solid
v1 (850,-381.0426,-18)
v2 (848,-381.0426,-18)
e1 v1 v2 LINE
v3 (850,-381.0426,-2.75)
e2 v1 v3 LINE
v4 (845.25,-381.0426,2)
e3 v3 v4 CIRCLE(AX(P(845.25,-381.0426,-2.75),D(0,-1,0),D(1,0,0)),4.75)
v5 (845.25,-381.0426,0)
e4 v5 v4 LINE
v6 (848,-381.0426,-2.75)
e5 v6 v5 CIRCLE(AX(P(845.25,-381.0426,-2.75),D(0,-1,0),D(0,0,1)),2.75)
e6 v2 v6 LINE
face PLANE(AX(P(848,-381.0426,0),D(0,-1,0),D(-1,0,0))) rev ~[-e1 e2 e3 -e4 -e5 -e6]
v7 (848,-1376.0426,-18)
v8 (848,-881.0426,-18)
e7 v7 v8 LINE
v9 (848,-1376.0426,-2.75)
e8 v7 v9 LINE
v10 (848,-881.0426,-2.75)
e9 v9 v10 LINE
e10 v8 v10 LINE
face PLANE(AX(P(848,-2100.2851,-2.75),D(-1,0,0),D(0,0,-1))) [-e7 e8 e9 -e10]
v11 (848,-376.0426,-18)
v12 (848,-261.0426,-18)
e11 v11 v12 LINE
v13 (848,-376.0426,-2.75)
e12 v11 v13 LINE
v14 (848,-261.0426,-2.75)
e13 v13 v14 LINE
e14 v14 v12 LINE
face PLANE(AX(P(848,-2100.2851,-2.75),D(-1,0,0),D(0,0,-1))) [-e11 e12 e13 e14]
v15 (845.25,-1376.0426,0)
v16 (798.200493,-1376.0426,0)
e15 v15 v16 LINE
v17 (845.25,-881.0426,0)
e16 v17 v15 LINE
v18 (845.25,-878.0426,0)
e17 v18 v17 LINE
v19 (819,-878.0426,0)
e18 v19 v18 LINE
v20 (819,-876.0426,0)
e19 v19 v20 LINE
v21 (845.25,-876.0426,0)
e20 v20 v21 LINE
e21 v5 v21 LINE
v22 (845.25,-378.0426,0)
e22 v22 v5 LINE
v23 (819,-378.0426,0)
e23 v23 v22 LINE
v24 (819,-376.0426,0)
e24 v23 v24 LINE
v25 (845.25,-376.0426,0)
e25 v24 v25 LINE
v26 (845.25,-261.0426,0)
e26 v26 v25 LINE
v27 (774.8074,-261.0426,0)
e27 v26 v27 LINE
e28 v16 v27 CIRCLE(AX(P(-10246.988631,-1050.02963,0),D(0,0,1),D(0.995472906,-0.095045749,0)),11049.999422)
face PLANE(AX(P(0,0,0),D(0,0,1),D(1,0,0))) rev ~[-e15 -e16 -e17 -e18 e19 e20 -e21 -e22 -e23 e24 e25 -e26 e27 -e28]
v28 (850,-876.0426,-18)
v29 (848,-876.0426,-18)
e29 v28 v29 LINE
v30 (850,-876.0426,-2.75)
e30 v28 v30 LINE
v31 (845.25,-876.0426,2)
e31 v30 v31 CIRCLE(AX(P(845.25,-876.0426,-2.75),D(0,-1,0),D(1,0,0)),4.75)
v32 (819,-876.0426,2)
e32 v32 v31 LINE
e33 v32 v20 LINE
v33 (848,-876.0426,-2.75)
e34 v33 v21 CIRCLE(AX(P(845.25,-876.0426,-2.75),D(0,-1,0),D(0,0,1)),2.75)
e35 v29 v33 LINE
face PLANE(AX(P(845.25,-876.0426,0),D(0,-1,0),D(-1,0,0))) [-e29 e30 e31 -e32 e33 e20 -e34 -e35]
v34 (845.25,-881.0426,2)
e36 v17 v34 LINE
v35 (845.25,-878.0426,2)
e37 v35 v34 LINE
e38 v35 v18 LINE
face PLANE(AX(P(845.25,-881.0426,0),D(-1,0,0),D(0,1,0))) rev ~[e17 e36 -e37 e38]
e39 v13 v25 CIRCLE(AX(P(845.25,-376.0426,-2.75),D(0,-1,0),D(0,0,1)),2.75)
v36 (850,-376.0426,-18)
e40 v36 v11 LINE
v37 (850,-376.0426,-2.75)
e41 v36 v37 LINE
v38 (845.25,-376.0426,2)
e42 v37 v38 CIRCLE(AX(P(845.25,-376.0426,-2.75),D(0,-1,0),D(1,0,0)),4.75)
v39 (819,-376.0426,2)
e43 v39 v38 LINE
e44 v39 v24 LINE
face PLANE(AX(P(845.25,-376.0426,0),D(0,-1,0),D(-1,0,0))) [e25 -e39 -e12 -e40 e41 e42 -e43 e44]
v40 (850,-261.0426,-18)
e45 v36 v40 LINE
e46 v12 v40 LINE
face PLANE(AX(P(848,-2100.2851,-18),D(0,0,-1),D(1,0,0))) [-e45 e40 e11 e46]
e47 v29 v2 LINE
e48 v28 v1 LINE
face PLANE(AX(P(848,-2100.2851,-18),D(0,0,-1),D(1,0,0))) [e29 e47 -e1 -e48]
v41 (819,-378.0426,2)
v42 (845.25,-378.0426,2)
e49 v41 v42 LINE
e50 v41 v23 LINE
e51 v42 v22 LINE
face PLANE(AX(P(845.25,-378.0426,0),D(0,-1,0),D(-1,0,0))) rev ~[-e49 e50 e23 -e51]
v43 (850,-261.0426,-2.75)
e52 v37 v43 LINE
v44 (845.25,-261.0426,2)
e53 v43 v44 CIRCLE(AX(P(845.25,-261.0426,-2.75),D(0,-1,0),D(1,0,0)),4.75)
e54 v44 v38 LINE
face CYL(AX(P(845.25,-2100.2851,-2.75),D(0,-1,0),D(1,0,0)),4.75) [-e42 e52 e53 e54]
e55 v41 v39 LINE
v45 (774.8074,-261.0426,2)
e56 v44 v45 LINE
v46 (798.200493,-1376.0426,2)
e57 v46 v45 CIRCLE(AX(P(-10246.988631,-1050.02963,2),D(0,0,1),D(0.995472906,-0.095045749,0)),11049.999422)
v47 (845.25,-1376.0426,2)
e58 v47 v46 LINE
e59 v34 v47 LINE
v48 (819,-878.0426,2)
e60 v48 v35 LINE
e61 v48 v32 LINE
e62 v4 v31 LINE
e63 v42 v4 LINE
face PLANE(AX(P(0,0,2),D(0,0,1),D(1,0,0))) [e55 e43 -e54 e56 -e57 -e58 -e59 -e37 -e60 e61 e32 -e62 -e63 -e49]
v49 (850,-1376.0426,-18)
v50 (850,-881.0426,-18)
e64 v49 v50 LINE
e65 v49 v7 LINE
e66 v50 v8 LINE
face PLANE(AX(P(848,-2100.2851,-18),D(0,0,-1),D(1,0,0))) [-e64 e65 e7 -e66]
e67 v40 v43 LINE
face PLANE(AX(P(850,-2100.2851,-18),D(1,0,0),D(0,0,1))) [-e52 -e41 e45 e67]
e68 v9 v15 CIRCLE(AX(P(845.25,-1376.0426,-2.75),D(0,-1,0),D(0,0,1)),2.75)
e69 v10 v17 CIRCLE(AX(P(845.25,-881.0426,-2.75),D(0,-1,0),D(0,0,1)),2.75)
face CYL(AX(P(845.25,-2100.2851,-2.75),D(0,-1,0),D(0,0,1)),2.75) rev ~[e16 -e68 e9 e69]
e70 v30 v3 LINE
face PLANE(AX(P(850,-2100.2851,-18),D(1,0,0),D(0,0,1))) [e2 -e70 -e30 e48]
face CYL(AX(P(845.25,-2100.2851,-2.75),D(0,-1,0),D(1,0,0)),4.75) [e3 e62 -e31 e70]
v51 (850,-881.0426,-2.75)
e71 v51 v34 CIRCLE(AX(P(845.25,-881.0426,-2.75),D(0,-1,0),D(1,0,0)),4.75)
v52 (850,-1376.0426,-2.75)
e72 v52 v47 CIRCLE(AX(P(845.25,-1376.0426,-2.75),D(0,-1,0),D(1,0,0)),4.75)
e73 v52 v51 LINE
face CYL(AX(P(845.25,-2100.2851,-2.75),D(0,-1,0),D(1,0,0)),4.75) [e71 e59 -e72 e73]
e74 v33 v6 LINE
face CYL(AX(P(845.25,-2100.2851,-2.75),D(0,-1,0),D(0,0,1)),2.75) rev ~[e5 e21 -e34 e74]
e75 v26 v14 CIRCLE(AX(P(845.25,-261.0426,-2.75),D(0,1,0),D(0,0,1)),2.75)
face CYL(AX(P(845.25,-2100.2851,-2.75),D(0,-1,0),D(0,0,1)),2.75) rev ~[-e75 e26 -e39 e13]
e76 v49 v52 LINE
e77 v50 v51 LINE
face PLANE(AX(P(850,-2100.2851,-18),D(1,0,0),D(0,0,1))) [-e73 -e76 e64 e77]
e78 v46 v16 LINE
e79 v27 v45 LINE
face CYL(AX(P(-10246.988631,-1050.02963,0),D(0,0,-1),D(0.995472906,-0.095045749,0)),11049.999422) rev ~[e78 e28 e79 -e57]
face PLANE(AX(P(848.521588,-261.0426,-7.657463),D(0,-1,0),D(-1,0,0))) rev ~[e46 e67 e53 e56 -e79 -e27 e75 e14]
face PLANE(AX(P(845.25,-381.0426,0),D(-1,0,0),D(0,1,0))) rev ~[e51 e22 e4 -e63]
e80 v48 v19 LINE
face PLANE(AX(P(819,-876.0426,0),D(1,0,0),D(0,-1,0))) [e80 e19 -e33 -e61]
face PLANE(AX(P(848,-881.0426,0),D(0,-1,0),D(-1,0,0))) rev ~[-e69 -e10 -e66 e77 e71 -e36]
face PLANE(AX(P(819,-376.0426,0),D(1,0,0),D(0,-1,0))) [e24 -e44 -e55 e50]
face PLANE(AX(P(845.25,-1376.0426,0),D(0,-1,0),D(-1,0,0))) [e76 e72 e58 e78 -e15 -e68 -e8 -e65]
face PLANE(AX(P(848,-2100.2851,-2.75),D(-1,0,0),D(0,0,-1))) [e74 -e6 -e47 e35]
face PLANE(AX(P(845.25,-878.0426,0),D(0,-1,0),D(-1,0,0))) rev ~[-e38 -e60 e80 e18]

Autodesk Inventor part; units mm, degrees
ref_plane "YZ Plane" through (0, 0, 0) normal (1, 0, 0) x (0, 1, 0)
ref_plane "XZ Plane" through (0, 0, 0) normal (0, 1, 0) x (-1, 0, 0)
ref_plane "XY Plane" through (0, 0, 0) normal (0, 0, 1) x (1, 0, 0)
sketch "Sketch1" plane through (0, 0, 0) normal (0, 0, 1) x (1, 0, 0)
  arc A0 (750, -2100) -> (770.3488, -241.0426) centre (-10250, -1050) ccw construction
  arc A1 (752.9864, -2100.2851) -> (771.4818, -215.8854) centre (-10246.9892, -1050.0296) ccw
  line L0 (-750, -2700) -> (-750, 0) construction
  line L1 (-800, 50) -> (-800, -2750) construction
  line L2 (-850, -2800) -> (-850, 100) construction
  line L3 (850, 100) -> (850, -2800)
  line L4 (800, -2750) -> (800, 50) construction
  line L5 (750, 0) -> (750, -2700) construction
  line L6 (770.3488, -241.0426) -> (767.3569, -241.2622) construction
  line L7 (768.4904, -216.1118) -> (771.4818, -215.8854) construction
  arc A2 (747.4657, -5.0326) -> (744.8748, -2.3426) centre (744.4792, -5.3164) ccw construction
  arc A3 (747.4657, -5.0326) -> (747.0136, -0.2851) centre (-10252.9895, -1050.2524) ccw construction
  arc A4 (767.3569, -241.2622) -> (747.4657, -5.0326) centre (-10252.9895, -1050.2524) ccw construction
  line L8 (750, 0) -> (747.0136, -0.2851) construction
  arc A5 (750.4522, -4.7486) -> (750, 0) centre (-10250, -1050) ccw construction
  arc A6 (750.4522, -4.7486) -> (745.2706, 0.6314) centre (744.4791, -5.3162) ccw
  line L9 (-750, 0) -> (750, 0) construction
  line L10 (-850, 100) -> (850, 100) construction
  line L11 (800, 50) -> (-800, 50) construction
  arc A7 (770.3488, -241.0426) -> (750.4522, -4.7486) centre (-10250, -1050) ccw
  line L12 (750, -2700) -> (-750, -2700) construction
  line L13 (750, -2100) -> (752.9864, -2100.2851) construction
  line L14 (-800, -2750) -> (800, -2750)
  line L15 (850, -2800) -> (-850, -2800) construction
  arc A8 (110, -2700) -> (114.1118, -2698.3696) centre (110, -2694) ccw construction
  line L16 (0, -2697) -> (110, -2697) construction
  line L17 (0, -2700) -> (0, -2697) construction
  arc A9 (750, 0) -> (745.2706, 0.6314) centre (0, -5600) ccw construction
  line L18 (750, 0) -> (749.6018, -2.9735) construction
  arc A10 (750, -3.0268) -> (0, 47) centre (-0.2, -5603) ccw construction
  line L19 (0, 47) -> (0, 0) construction
  line L20 (0, 50) -> (0, 47) construction
  line L21 (0, 100) -> (0, 50)
  arc A11 (745.2706, 0.6314) -> (0, 50) centre (0, -5600) ccw construction
  line L22 (-750, -2100) -> (750, -2100) construction
  arc A12 (110, -2697) -> (112.0559, -2696.1848) centre (110, -2694) ccw construction
  line L23 (676.3163, -2173.4556) -> (674.2605, -2171.2708) construction
  line L24 (690.4112, -2151.9536) -> (692.4671, -2154.1384) construction
  line L25 (752.0559, -2102.1848) -> (676.3163, -2173.4556) construction
  line L26 (114.1118, -2698.3696) -> (750, -2100) construction
  arc A13 (752.0559, -2102.1848) -> (752.9864, -2100.2851) centre (749.9998, -2099.9999) ccw construction
  line L27 (750, -2100) -> (752.0559, -2102.1848) construction
  arc A14 (749.1768, -2100.7746) -> (750.1074, -2098.8746) centre (747.1209, -2098.5898) ccw construction
  line L28 (112.0559, -2696.1848) -> (690.4112, -2151.9536) construction
  line L29 (850, -261.0426) -> (774.8074, -261.0426)
  arc A15 (800, 50) -> (0, 100) centre (0, -6325) ccw construction
  arc A16 (824.8074, -261.0426) -> (800, 50) centre (-10695.3477, -1023.3288) ccw construction
  line L30 (824.8074, -261.0426) -> (824.8074, 100) construction
  arc A17 (789.9065, -2131.1044) -> (824.8074, -261.0426) centre (-10201.0809, -990.6233) ccw construction
  line L31 (0, -2700) -> (0, -2750) construction
  line L32 (112.3791, -2700) -> (132.2053, -2750) construction
  line L33 (132.2053, -2750) -> (850, -2074.5565)
  arc A18 (770.2924, -241.0467) -> (766.5756, -191.1852) centre (768.4904, -216.1118) ccw construction
  line L34 (850, -400) -> (783.8749, -400) construction
  line L35 (850, -900) -> (801.9923, -900) construction
  line L36 (850, -1400) -> (797.4674, -1400) construction
  line L37 (850, -1900) -> (770.2723, -1900) construction
  line L38 (350, 100) -> (350, 39.1489)
  line L39 (-1472.612, -150) -> (-973.4947, -150)
  line L40 (-1472.612, -700) -> (-973.4947, -700)
  line L41 (-1472.612, -1250) -> (-973.4947, -1250)
  line L42 (-1472.612, -1800) -> (-973.4947, -1800)
  line L43 (800, -2750) -> (850, -2750) construction
  line L44 (752.9864, -2100.2851) -> (850, -2100.2851)
  point P0 (822.6583, -2100.2851)
  dimension "d16" = 1500
  dimension "d17" = 2700
  dimension "d18" = 2100
  dimension "d19" = 6
  dimension "d20" = 3
  dimension "d21" = 3
  dimension "d22" = 6
  dimension "d23" = 3
  dimension "d24" = 241.9
  dimension "d25" = 50
  dimension "d26" = 50
  dimension "d27" = 3
  dimension "d28" = 110
  dimension "d29" = 25
  dimension "d30" = 104
  dimension "d31" = 25
  dimension "d32" = 20
  dimension "d33" = 50
  dimension "d57" = 500
  dimension "d58" = 500
  dimension "d59" = 500
  dimension "d60" = 500
  dimension "d61" = 500
  dimension "d83" = 250
  dimension "d86" = 550
  dimension "d91" = 274.5565
extrude "Plate3" add sketch "Sketch1" along normal blind 2
sketch "Sketch3" plane through (848, -261.0426, 2) normal (1, 0, 0) x (0, 1, 0)
  line L0 (-1839.2425, 0) -> (0, 0)
  line L1 (0, 0) -> (0, 20)
  line L2 (0, 20) -> (-1839.2425, 20)
  line L3 (-1839.2425, 20) -> (-1839.2425, 0)
edge flange "Flange2" height 20 angle 90 thickness 2 bend radius 2.75 thickness toward (1, 0, 0) relief round relief width 2 relief depth 1 edges at (850, -1167.7996, 2) wall of the first edge with corners at (848, -2100.2851, 2) (848, -261.0426, 2) (848, -261.0426, -18) (848, -2100.2851, -18)
bend "Bend2"
corner "Corner2"
sketch "Sketch5" plane through (0, 0, 0) normal (0, 0, 1) x (1, 0, 0)
  line L0 (845.25, -2100.2851) -> (845.25, -261.0426) projected
  line L1 (774.8074, -261.0426) -> (845.25, -261.0426) projected
  arc A0 (752.9864, -2100.2851) -> (774.8074, -261.0426) centre (-10246.9892, -1050.0296) ccw projected
  line L2 (850, -261.0426) -> (850, -2100.2851) projected
  line L3 (850, -376.0426) -> (819, -376.0426)
  line L4 (850, -378.0426) -> (848, -378.0426) construction
  line L5 (848, -2100.2851) -> (848, -261.0426) projected
  line L6 (819, -376.0426) -> (819, -378.0426)
  line L7 (850, -876.0416) -> (801.641, -876.0416) construction
  line L8 (850, -878.0416) -> (801.6723, -878.0416) construction
  line L9 (820, -876.0416) -> (820, -878.0416) construction
  line L10 (850, -1376.0416) -> (798.2005, -1376.0416) construction
  line L11 (850, -1378.0416) -> (798.1413, -1378.0416) construction
  line L12 (820, -1376.0416) -> (820, -1378.0416) construction
  line L13 (850, -1876.0416) -> (772.0945, -1876.0416) construction
  line L14 (850, -1878.0416) -> (771.9443, -1878.0416) construction
  line L15 (820, -1876.0416) -> (820, -1878.0416) construction
  line L16 (850, -881.0416) -> (845.25, -881.0416) construction
  line L17 (845.25, -1381.0416) -> (850, -1381.0416) construction
  line L18 (845.25, -1881.0416) -> (850, -1881.0416) construction
  line L19 (845.25, -2100.2851) -> (752.9864, -2100.2851) projected
  line L20 (850, -376.0426) -> (850, -381.0426)
  line L21 (848, -376.0426) -> (848, -378.0426) construction
  line L22 (850, -381.0426) -> (848, -381.0426)
  line L23 (819, -376.0426) -> (782.437, -376.0426) construction
  line L24 (819, -378.0426) -> (782.559, -378.0426) construction
  line L25 (848, -378.0426) -> (848, -381.0426)
  line L26 (848, -378.0426) -> (819, -378.0426)
  line L27 (848, -381.0426) -> (845.25, -381.0426)
  point P0 (0, 0)
  point P1 (845.25, -380.4205)
  point P2 (848, -380.4205)
  point P3 (848, -1881.0416)
  point P4 (848, -1878.0416)
  point P5 (848, -1381.0416)
  point P6 (848, -1378.0416)
  point P7 (848, -881.0416)
  point P8 (848, -878.0416)
  point P9 (819, -377.0426)
  point P10 (848, -381.0426)
  point P11 (850, -410.4205)
  point P12 (848, -376.0426)
  point P13 (820, -877.0416)
  point P14 (820, -1377.0416)
  point P15 (820, -1877.0416)
  point P16 (848, -381.0426)
  point P17 (845.25, -378.0426)
  dimension "d69" = 1839.2425
  dimension "d70" = 2
  dimension "d76" = 67.563
  dimension "d80" = 48.359
  dimension "d81" = 30
  dimension "d94" = 5
  dimension "d95" = 30
  dimension "d96" = 5
  dimension "d97" = 30
  dimension "d98" = 5
  dimension "d102" = 77.9056
  dimension "d104" = 51.7995
  dimension "d106" = 2
  dimension "d107" = 5
  dimension "d108" = 116
  dimension "d109" = 500
  dimension "d110" = 500
  dimension "d111" = 500
  dimension "d112" = 31
extrude "Extrusion2" cut sketch "Sketch5" along normal through all both and the other way through all contours L0 L26 L5 L27 | L26 L6 L3 L0 | L0 L3 L5 L26 | L5 L3 L2 L22
chamfer "Chamfer2" [suppressed]
pattern_linear "Rectangular Pattern3" count 4 spacing 500 along (0, -1, 0) of "Extrusion2"
sketch "Sketch6" plane through (0, 0, 0) normal (0, 0, -1) x (-1, 0, 0)
  line L0 (-803.1643, -1276.0426) -> (-817.1643, -1276.0426) construction
  line L1 (-817.1643, -1276.0426) -> (-817.1643, -1076.0426) construction
  line L2 (-817.1643, -1076.0426) -> (-803.1643, -1076.0426) construction
  line L3 (-803.1643, -1076.0426) -> (-803.1643, -1276.0426) construction
  line L4 (-752.9864, -2100.2851) -> (-845.25, -2100.2851) projected
  line L5 (-803.1643, -1801.0426) -> (-803.1643, -1851.0426) construction
  line L6 (-803.1643, -1851.0426) -> (-815.1643, -1851.0426) construction
  line L7 (-815.1643, -1851.0426) -> (-815.1643, -1801.0426) construction
  line L8 (-815.1643, -1801.0426) -> (-803.1643, -1801.0426) construction
  line L9 (-845.25, -1876.0426) -> (-819, -1876.0426) projected
  line L10 (-803.1643, -1301.0426) -> (-803.1643, -1351.0426) construction
  line L11 (-803.1643, -1351.0426) -> (-815.1643, -1351.0426) construction
  line L12 (-815.1643, -1351.0426) -> (-815.1643, -1301.0426) construction
  line L13 (-815.1643, -1301.0426) -> (-803.1643, -1301.0426) construction
  line L14 (-803.1643, -801.0426) -> (-803.1643, -851.0426) construction
  line L15 (-803.1643, -851.0426) -> (-815.1643, -851.0426) construction
  line L16 (-815.1643, -851.0426) -> (-815.1643, -801.0426) construction
  line L17 (-815.1643, -801.0426) -> (-803.1643, -801.0426) construction
  line L18 (-803.1643, -301.0426) -> (-803.1643, -351.0426) construction
  line L19 (-803.1643, -351.0426) -> (-815.1643, -351.0426) construction
  line L20 (-815.1643, -351.0426) -> (-815.1643, -301.0426) construction
  line L21 (-815.1643, -301.0426) -> (-803.1643, -301.0426) construction
  line L22 (-845.25, -1376.0426) -> (-819, -1376.0426) projected
  line L23 (-845.25, -876.0426) -> (-819, -876.0426) projected
  line L24 (-845.25, -376.0426) -> (-819, -376.0426) projected
  point P0 (0, 0)
  point P1 (-753.1643, -2098.4205)
  point P2 (-824.6397, -2098.4205)
  dimension "d120" = 200
  dimension "d121" = 14
  dimension "d124" = 50
  dimension "d125" = 12
  dimension "d126" = 50
  dimension "d127" = 25
  dimension "d128" = 50
  dimension "d129" = 12
  dimension "d130" = 50
  dimension "d131" = 12
  dimension "d132" = 50
  dimension "d133" = 12
  dimension "d134" = 50
  dimension "d135" = 25
  dimension "d136" = 25
  dimension "d137" = 25
  dimension "d138" = 50
  dimension "d139" = 50
  dimension "d140" = 50
  dimension "d143" = 100
mark "Mark1"
sketch "Sketch7" plane through (0, 0, 0) normal (0, 0, 1) x (1, 0, 0)
  line L0 (845.25, -1878.0426) -> (819, -1878.0426) construction
  line L1 (819, -1878.0426) -> (819, -1876.0426) construction
  line L2 (819, -1876.0426) -> (845.25, -1876.0426) construction
  line L3 (845.25, -1876.0426) -> (845.25, -1381.0426) construction
  line L4 (845.25, -1381.0426) -> (845.25, -1378.0426) construction
  line L5 (845.25, -1378.0426) -> (819, -1378.0426) construction
  line L6 (819, -1378.0426) -> (819, -1376.0426) construction
  line L7 (819, -1376.0426) -> (845.25, -1376.0426) construction
  line L8 (845.25, -1376.0426) -> (845.25, -881.0426) construction
  line L9 (845.25, -881.0426) -> (845.25, -878.0426) construction
  line L10 (845.25, -878.0426) -> (819, -878.0426) construction
  line L11 (819, -878.0426) -> (819, -876.0426) construction
  line L12 (819, -876.0426) -> (845.25, -876.0426) construction
  line L13 (845.25, -876.0426) -> (845.25, -381.0426) construction
  line L14 (845.25, -381.0426) -> (845.25, -378.0426) projected
  line L15 (845.25, -378.0426) -> (819, -378.0426) projected
  line L16 (819, -378.0426) -> (819, -376.0426) projected
  line L17 (819, -376.0426) -> (845.25, -376.0426) projected
  line L18 (845.25, -376.0426) -> (845.25, -261.0426) projected
  line L19 (774.8074, -261.0426) -> (845.25, -261.0426) projected
  arc A0 (752.9864, -2100.2851) -> (774.8074, -261.0426) centre (-10246.9892, -1050.0296) ccw construction
  line L20 (845.25, -2100.2851) -> (752.9864, -2100.2851) construction
  line L21 (845.25, -2100.2851) -> (845.25, -1881.0426) construction
  line L22 (845.25, -1881.0426) -> (845.25, -1878.0426) construction
  line L23 (716.6808, -2132.1957) -> (990.5996, -2132.1957)
  line L24 (990.5996, -2132.1957) -> (990.5996, -1376.0426)
  line L25 (990.5996, -1376.0426) -> (716.6808, -1376.0426)
  line L26 (716.6808, -1376.0426) -> (716.6808, -2132.1957)
  point P0 (0, 0)
extrude "Extrusion3" cut sketch "Sketch7" along normal through all both and the other way through all
equation "\"d16\" = d34"
equation "\"d17\" = d35"
equation "\"d18\" = d36"
equation "\"d19\" = d37"
equation "\"d20\" = d38"
equation "\"d21\" = d39"
equation "\"d22\" = d39 + d43"
equation "\"d23\" = d39"
equation "\"d27\" = d39"
equation "\"d28\" = 0.5 * d44"
equation "\"d29\" = d41"
equation "\"d30\" = d42"
equation "\"d31\" = d41"
equation "\"d33\" = d25"
equation "\"Стрингер_3\" = 67.36301"
equation "\"d37\" = d39 + d43"
equation "\"d38\" = d39"
equation "\"d43\" = d39"
equation "\"Стрингер_4\" = 48.15903"
equation "\"Стрингер_5\" = 51.59945"
equation "\"Стрингер_6\" = 77.70555"
equation "\"d34\" = 1500"
equation "\"d35\" = 2700"
equation "\"d36\" = 2100"
equation "\"d39\" = 3"
equation "\"d44\" = 220"
equation "\"d41\" = 25"
equation "\"d42\" = 104"
properties part number "MSC 315 rib hip" material "Stainless Steel"
